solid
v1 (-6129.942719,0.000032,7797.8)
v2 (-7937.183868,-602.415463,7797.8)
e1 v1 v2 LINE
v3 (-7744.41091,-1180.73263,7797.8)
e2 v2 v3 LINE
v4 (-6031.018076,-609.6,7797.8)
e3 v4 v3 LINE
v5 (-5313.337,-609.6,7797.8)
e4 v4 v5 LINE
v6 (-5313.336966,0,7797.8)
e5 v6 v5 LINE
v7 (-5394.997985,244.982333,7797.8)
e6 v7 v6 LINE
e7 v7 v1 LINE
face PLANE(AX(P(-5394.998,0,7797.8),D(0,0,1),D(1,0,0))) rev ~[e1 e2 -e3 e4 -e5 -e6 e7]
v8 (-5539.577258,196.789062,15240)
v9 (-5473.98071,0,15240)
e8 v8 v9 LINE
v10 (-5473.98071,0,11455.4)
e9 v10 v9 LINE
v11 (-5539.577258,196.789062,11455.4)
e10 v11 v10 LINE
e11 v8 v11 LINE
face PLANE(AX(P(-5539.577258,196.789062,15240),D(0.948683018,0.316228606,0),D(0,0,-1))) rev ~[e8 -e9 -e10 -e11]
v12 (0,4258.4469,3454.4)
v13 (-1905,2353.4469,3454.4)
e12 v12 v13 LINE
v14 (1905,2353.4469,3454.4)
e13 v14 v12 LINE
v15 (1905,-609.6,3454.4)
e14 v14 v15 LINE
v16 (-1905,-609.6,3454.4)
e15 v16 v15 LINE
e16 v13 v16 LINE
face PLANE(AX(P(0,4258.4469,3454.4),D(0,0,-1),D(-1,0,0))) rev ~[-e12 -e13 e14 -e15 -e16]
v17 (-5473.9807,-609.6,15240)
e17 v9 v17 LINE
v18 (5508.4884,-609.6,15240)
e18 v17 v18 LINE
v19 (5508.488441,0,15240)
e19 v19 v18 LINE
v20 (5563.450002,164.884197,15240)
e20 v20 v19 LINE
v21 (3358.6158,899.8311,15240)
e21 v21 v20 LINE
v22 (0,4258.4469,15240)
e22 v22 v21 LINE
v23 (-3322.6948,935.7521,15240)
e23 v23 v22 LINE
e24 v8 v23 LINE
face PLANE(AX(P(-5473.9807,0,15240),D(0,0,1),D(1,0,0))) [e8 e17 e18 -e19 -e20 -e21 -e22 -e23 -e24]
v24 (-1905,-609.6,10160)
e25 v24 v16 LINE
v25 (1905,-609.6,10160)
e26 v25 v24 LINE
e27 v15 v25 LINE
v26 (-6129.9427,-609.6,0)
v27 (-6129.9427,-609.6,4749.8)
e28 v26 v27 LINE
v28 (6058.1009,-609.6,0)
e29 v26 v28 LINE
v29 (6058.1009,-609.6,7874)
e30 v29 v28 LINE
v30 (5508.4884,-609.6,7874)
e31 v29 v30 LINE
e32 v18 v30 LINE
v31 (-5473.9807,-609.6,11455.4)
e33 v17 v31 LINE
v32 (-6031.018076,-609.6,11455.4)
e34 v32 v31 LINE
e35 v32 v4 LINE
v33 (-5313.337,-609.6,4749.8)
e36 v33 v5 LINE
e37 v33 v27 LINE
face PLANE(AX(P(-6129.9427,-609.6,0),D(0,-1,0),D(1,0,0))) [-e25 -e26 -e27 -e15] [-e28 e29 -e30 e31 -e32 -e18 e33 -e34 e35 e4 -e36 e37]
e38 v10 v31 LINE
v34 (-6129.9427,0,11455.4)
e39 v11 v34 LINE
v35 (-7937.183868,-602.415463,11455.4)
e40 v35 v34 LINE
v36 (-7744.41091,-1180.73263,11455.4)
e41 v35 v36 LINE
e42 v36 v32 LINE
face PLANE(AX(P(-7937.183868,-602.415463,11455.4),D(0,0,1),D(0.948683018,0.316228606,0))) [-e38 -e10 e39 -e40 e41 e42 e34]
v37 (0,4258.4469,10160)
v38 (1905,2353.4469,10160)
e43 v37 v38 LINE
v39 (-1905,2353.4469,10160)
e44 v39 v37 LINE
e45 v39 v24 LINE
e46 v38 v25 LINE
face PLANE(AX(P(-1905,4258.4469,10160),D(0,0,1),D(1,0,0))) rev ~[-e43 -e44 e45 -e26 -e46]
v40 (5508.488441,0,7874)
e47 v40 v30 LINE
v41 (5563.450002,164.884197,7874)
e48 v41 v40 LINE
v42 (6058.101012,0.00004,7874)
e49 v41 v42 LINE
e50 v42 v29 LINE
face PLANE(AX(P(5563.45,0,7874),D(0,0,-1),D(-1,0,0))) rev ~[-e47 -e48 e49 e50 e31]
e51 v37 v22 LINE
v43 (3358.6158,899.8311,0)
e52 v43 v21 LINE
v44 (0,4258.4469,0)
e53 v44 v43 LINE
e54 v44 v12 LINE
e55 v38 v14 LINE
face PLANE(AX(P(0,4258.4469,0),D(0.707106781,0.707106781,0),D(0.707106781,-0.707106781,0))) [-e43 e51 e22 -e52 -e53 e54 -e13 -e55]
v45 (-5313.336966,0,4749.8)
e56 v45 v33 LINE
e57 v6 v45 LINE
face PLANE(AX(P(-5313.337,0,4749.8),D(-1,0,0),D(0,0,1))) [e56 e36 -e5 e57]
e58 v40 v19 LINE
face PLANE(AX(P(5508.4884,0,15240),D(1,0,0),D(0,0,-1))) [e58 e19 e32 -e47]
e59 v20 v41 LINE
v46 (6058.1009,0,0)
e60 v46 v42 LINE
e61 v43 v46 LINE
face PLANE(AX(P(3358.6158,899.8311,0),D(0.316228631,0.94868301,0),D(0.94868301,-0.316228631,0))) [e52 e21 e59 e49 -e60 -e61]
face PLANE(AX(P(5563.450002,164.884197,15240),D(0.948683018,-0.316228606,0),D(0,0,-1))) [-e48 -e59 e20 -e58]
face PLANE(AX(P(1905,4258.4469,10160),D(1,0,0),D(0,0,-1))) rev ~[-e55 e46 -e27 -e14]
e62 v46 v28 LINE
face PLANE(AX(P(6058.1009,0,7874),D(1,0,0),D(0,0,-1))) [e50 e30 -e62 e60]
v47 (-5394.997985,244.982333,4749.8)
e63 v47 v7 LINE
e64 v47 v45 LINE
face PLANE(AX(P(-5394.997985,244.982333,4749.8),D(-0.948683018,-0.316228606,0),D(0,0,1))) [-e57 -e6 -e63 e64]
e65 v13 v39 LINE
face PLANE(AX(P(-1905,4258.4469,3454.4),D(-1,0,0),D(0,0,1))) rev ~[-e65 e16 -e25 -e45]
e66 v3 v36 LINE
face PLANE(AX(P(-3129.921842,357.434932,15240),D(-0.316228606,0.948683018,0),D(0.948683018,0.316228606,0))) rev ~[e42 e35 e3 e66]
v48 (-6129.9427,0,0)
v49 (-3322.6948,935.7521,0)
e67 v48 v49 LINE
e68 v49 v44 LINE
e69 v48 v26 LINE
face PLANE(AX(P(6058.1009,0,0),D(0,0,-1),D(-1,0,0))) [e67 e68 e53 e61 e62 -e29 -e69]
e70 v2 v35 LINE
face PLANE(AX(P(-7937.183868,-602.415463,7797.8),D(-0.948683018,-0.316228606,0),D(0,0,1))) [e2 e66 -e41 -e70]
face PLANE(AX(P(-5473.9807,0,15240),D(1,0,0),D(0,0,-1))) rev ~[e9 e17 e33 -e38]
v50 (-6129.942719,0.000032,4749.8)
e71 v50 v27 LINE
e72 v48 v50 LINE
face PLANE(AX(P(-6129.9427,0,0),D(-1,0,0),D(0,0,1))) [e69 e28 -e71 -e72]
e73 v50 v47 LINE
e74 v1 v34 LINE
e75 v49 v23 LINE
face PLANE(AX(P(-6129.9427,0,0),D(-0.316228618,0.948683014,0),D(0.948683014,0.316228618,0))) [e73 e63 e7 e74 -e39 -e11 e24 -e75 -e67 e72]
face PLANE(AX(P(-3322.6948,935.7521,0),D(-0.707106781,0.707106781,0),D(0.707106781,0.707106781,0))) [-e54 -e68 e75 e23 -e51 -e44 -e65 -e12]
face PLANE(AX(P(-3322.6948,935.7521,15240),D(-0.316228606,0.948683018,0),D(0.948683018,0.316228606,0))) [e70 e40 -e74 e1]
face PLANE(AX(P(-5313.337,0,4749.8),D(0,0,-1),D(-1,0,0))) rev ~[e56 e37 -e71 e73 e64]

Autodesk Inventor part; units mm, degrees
ref_plane "YZ Plane" through (0, 0, 0) normal (1, 0, 0) x (0, 1, 0)
ref_plane "XY Plane" through (0, 0, 0) normal (0, 0, 1) x (1, 0, 0)
sketch "Sketch1" plane through (0, 0, 0) normal (0, 0, 1) x (1, 0, 0)
  line L0 (0, 0) -> (-6129.9427, 0)
  line L1 (-6129.9427, 0) -> (-3322.6948, 935.7521)
  line L2 (-3322.6948, 935.7521) -> (-1557.9427, 935.7521) construction
  line L3 (-3322.6948, 935.7521) -> (0, 4258.4469)
  line L4 (0, 4258.4469) -> (0, 0) construction
  line L5 (0, 4258.4469) -> (3358.6158, 899.8311)
  line L6 (3358.6158, 899.8311) -> (0, 899.8311) construction
  line L7 (3358.6158, 899.8311) -> (6058.1009, 0)
  line L8 (6058.1009, 0) -> (0, 0)
  dimension "d1" = 18.435
  dimension "d2" = 2959.1
  dimension "d4" = 45
  dimension "d6" = 4699
  dimension "d7" = 45
  dimension "d8" = 4749.8
  dimension "d9" = 18.435
  dimension "d10" = 2845.508
extrude "Extrusion1" add sketch "Sketch1" along normal blind 15240
sketch "Sketch2" plane through (3358.6158, 899.8311, 15240) normal (0.3162286, 0.948683, 0) x (0.948683, -0.3162286, 0)
  line L0 (2845.5081, 0) -> (0, 0) projected
  line L1 (2845.5081, 0) -> (2324.1, 0)
  line L2 (2324.1, 0) -> (2324.1, 7366)
  line L3 (2324.1, 7366) -> (2845.5081, 7366)
  line L4 (2845.5081, 7366) -> (2845.5081, 0)
  line L5 (2845.5081, 15240) -> (0, 15240) projected
  line L6 (0, 15240) -> (0, 0) projected
  point P0 (-2901.7094, 15240)
  point P1 (2324.1, 0)
  dimension "d13" = 7874
  dimension "d14" = 2324.1
extrude "Extrusion2" cut sketch "Sketch2" against normal through all
sketch "Sketch3" plane through (-6129.9427, 0, 15240) normal (-0.3162286, 0.948683, 0) x (0.948683, 0.3162286, 0)
  line L0 (0, 0) -> (622.3, 0)
  line L1 (622.3, 0) -> (622.3, 3784.6)
  line L2 (622.3, 3784.6) -> (0, 3784.6)
  line L3 (0, 3784.6) -> (0, 0)
  line L4 (2959.1, 15240) -> (2959.1, 0) projected
  point P0 (5815.3725, 15240)
  dimension "d17" = 2336.8
  dimension "d18" = 3784.6
extrude "Extrusion3" cut sketch "Sketch3" against normal through all
sketch "Sketch4" plane through (-3322.6948, 935.7521, 15240) normal (-0.3162286, 0.948683, 0) x (0.948683, 0.3162286, 0)
  line L0 (-2959.1, 15240) -> (-2959.1, 3784.6) projected
  line L1 (-2959.1, 10490.2) -> (-2184.4, 10490.2)
  line L2 (-2184.4, 10490.2) -> (-2184.4, 7442.2)
  line L3 (-2184.4, 7442.2) -> (-2959.1, 7442.2)
  line L4 (-2959.1, 7442.2) -> (-2959.1, 10490.2)
  line L5 (0, 15240) -> (-2959.1, 15240) projected
  line L6 (0, 15240) -> (0, 0) projected
  line L7 (-2959.1, 3784.6) -> (-2336.8, 3784.6) projected
  point P0 (2856.2725, 15240)
  point P1 (-2959.1, 7442.2)
  dimension "d22" = 4749.8
  dimension "d23" = 2184.4
  dimension "d24" = 3657.6
extrude "Extrusion4" cut sketch "Sketch4" against normal through all
sketch "Sketch5" plane through (-6129.9427, 0, 0) normal (0, -1, 0) x (1, 0, 0)
  line L0 (655.962, 15240) -> (11638.4311, 15240) projected
  line L1 (655.962, 15240) -> (11638.4311, 15240)
  line L2 (11693.3927, 7874) -> (11638.4311, 7874) projected
  line L3 (11638.4311, 15240) -> (11638.4311, 7874)
  line L4 (11638.4311, 7874) -> (12188.0436, 7874)
  line L5 (12188.0436, 0) -> (9488.5585, 0) projected
  line L6 (12188.0436, 7874) -> (12188.0436, 0)
  line L7 (2807.2479, 0) -> (0, 0) projected
  line L8 (12188.0436, 0) -> (0, 0)
  line L9 (0, 0) -> (0, 4749.8) projected
  line L10 (0, 0) -> (0, 4749.8)
  line L11 (816.6057, 4749.8) -> (0, 4749.8) projected
  line L12 (0, 4749.8) -> (816.6057, 4749.8)
  line L13 (734.9447, 7797.8) -> (816.6057, 7797.8) projected
  line L14 (816.6057, 4749.8) -> (816.6057, 7797.8)
  line L15 (734.9447, 7797.8) -> (0, 7797.8) projected
  line L16 (816.6057, 7797.8) -> (0, 7797.8)
  line L17 (0, 7797.8) -> (0, 11455.4) projected
  line L18 (0, 7797.8) -> (0, 11455.4)
  line L19 (655.962, 15240) -> (655.962, 11455.4) projected
  line L20 (0, 11455.4) -> (655.962, 11455.4)
  line L21 (655.962, 11455.4) -> (655.962, 15240)
  point P0 (6129.9427, 0)
extrude "Extrusion5" add sketch "Sketch5" along normal blind 609.6
sketch "Sketch6" plane through (-3322.6948, 935.7521, 15240) normal (-0.3162286, 0.948683, 0) x (0.948683, 0.3162286, 0)
  line L0 (-2184.4, 7442.2) -> (-2959.1, 7442.2) projected
  line L1 (-2959.1, 7442.2) -> (-4864.1, 7442.2)
  line L2 (-4864.1, 7442.2) -> (-4864.1, 3784.6)
  line L3 (-4864.1, 3784.6) -> (-2959.1, 3784.6)
  line L4 (-2959.1, 3784.6) -> (-2959.1, 7442.2)
  point P0 (2856.2725, 15240)
  dimension "d29" = 1905
extrude "Extrusion6" add sketch "Sketch6" against normal blind 609.6
ref_plane "Work Plane1" through (0, 4258.4469, 15240) normal (0, 1, 0) x (-1, 0, 0)
sketch "Sketch7" plane through (0, 4258.4469, 15240) normal (0, 1, 0) x (-1, 0, 0)
  line L0 (1905, -5080) -> (-1905, -5080)
  line L1 (-1905, -5080) -> (-1905, -11785.6)
  line L2 (-1905, -11785.6) -> (1905, -11785.6)
  line L3 (1905, -11785.6) -> (1905, -5080)
  line L4 (0, -15240) -> (0, 0) projected
  line L5 (1905, -5080) -> (-1905, -11785.6) construction
  line L6 (-1905, -5080) -> (1905, -11785.6) construction
  point P0 (0, -8432.8)
  dimension "d32" = 5080
  dimension "d33" = 6705.6
  dimension "d34" = 3810
extrude "Extrusion7" cut sketch "Sketch7" against normal through all
equation "\"d1\" = pitch_4_12"
equation "\"d4\" = pitch_12_12"
equation "\"d7\" = pitch_12_12"
equation "\"d9\" = pitch_4_12"
equation "\"pitch_4_12\" = 18.435deg"
equation "\"pitch_12_12\" = 45deg"
properties part number "12-12-PartOfHouseRoof"
